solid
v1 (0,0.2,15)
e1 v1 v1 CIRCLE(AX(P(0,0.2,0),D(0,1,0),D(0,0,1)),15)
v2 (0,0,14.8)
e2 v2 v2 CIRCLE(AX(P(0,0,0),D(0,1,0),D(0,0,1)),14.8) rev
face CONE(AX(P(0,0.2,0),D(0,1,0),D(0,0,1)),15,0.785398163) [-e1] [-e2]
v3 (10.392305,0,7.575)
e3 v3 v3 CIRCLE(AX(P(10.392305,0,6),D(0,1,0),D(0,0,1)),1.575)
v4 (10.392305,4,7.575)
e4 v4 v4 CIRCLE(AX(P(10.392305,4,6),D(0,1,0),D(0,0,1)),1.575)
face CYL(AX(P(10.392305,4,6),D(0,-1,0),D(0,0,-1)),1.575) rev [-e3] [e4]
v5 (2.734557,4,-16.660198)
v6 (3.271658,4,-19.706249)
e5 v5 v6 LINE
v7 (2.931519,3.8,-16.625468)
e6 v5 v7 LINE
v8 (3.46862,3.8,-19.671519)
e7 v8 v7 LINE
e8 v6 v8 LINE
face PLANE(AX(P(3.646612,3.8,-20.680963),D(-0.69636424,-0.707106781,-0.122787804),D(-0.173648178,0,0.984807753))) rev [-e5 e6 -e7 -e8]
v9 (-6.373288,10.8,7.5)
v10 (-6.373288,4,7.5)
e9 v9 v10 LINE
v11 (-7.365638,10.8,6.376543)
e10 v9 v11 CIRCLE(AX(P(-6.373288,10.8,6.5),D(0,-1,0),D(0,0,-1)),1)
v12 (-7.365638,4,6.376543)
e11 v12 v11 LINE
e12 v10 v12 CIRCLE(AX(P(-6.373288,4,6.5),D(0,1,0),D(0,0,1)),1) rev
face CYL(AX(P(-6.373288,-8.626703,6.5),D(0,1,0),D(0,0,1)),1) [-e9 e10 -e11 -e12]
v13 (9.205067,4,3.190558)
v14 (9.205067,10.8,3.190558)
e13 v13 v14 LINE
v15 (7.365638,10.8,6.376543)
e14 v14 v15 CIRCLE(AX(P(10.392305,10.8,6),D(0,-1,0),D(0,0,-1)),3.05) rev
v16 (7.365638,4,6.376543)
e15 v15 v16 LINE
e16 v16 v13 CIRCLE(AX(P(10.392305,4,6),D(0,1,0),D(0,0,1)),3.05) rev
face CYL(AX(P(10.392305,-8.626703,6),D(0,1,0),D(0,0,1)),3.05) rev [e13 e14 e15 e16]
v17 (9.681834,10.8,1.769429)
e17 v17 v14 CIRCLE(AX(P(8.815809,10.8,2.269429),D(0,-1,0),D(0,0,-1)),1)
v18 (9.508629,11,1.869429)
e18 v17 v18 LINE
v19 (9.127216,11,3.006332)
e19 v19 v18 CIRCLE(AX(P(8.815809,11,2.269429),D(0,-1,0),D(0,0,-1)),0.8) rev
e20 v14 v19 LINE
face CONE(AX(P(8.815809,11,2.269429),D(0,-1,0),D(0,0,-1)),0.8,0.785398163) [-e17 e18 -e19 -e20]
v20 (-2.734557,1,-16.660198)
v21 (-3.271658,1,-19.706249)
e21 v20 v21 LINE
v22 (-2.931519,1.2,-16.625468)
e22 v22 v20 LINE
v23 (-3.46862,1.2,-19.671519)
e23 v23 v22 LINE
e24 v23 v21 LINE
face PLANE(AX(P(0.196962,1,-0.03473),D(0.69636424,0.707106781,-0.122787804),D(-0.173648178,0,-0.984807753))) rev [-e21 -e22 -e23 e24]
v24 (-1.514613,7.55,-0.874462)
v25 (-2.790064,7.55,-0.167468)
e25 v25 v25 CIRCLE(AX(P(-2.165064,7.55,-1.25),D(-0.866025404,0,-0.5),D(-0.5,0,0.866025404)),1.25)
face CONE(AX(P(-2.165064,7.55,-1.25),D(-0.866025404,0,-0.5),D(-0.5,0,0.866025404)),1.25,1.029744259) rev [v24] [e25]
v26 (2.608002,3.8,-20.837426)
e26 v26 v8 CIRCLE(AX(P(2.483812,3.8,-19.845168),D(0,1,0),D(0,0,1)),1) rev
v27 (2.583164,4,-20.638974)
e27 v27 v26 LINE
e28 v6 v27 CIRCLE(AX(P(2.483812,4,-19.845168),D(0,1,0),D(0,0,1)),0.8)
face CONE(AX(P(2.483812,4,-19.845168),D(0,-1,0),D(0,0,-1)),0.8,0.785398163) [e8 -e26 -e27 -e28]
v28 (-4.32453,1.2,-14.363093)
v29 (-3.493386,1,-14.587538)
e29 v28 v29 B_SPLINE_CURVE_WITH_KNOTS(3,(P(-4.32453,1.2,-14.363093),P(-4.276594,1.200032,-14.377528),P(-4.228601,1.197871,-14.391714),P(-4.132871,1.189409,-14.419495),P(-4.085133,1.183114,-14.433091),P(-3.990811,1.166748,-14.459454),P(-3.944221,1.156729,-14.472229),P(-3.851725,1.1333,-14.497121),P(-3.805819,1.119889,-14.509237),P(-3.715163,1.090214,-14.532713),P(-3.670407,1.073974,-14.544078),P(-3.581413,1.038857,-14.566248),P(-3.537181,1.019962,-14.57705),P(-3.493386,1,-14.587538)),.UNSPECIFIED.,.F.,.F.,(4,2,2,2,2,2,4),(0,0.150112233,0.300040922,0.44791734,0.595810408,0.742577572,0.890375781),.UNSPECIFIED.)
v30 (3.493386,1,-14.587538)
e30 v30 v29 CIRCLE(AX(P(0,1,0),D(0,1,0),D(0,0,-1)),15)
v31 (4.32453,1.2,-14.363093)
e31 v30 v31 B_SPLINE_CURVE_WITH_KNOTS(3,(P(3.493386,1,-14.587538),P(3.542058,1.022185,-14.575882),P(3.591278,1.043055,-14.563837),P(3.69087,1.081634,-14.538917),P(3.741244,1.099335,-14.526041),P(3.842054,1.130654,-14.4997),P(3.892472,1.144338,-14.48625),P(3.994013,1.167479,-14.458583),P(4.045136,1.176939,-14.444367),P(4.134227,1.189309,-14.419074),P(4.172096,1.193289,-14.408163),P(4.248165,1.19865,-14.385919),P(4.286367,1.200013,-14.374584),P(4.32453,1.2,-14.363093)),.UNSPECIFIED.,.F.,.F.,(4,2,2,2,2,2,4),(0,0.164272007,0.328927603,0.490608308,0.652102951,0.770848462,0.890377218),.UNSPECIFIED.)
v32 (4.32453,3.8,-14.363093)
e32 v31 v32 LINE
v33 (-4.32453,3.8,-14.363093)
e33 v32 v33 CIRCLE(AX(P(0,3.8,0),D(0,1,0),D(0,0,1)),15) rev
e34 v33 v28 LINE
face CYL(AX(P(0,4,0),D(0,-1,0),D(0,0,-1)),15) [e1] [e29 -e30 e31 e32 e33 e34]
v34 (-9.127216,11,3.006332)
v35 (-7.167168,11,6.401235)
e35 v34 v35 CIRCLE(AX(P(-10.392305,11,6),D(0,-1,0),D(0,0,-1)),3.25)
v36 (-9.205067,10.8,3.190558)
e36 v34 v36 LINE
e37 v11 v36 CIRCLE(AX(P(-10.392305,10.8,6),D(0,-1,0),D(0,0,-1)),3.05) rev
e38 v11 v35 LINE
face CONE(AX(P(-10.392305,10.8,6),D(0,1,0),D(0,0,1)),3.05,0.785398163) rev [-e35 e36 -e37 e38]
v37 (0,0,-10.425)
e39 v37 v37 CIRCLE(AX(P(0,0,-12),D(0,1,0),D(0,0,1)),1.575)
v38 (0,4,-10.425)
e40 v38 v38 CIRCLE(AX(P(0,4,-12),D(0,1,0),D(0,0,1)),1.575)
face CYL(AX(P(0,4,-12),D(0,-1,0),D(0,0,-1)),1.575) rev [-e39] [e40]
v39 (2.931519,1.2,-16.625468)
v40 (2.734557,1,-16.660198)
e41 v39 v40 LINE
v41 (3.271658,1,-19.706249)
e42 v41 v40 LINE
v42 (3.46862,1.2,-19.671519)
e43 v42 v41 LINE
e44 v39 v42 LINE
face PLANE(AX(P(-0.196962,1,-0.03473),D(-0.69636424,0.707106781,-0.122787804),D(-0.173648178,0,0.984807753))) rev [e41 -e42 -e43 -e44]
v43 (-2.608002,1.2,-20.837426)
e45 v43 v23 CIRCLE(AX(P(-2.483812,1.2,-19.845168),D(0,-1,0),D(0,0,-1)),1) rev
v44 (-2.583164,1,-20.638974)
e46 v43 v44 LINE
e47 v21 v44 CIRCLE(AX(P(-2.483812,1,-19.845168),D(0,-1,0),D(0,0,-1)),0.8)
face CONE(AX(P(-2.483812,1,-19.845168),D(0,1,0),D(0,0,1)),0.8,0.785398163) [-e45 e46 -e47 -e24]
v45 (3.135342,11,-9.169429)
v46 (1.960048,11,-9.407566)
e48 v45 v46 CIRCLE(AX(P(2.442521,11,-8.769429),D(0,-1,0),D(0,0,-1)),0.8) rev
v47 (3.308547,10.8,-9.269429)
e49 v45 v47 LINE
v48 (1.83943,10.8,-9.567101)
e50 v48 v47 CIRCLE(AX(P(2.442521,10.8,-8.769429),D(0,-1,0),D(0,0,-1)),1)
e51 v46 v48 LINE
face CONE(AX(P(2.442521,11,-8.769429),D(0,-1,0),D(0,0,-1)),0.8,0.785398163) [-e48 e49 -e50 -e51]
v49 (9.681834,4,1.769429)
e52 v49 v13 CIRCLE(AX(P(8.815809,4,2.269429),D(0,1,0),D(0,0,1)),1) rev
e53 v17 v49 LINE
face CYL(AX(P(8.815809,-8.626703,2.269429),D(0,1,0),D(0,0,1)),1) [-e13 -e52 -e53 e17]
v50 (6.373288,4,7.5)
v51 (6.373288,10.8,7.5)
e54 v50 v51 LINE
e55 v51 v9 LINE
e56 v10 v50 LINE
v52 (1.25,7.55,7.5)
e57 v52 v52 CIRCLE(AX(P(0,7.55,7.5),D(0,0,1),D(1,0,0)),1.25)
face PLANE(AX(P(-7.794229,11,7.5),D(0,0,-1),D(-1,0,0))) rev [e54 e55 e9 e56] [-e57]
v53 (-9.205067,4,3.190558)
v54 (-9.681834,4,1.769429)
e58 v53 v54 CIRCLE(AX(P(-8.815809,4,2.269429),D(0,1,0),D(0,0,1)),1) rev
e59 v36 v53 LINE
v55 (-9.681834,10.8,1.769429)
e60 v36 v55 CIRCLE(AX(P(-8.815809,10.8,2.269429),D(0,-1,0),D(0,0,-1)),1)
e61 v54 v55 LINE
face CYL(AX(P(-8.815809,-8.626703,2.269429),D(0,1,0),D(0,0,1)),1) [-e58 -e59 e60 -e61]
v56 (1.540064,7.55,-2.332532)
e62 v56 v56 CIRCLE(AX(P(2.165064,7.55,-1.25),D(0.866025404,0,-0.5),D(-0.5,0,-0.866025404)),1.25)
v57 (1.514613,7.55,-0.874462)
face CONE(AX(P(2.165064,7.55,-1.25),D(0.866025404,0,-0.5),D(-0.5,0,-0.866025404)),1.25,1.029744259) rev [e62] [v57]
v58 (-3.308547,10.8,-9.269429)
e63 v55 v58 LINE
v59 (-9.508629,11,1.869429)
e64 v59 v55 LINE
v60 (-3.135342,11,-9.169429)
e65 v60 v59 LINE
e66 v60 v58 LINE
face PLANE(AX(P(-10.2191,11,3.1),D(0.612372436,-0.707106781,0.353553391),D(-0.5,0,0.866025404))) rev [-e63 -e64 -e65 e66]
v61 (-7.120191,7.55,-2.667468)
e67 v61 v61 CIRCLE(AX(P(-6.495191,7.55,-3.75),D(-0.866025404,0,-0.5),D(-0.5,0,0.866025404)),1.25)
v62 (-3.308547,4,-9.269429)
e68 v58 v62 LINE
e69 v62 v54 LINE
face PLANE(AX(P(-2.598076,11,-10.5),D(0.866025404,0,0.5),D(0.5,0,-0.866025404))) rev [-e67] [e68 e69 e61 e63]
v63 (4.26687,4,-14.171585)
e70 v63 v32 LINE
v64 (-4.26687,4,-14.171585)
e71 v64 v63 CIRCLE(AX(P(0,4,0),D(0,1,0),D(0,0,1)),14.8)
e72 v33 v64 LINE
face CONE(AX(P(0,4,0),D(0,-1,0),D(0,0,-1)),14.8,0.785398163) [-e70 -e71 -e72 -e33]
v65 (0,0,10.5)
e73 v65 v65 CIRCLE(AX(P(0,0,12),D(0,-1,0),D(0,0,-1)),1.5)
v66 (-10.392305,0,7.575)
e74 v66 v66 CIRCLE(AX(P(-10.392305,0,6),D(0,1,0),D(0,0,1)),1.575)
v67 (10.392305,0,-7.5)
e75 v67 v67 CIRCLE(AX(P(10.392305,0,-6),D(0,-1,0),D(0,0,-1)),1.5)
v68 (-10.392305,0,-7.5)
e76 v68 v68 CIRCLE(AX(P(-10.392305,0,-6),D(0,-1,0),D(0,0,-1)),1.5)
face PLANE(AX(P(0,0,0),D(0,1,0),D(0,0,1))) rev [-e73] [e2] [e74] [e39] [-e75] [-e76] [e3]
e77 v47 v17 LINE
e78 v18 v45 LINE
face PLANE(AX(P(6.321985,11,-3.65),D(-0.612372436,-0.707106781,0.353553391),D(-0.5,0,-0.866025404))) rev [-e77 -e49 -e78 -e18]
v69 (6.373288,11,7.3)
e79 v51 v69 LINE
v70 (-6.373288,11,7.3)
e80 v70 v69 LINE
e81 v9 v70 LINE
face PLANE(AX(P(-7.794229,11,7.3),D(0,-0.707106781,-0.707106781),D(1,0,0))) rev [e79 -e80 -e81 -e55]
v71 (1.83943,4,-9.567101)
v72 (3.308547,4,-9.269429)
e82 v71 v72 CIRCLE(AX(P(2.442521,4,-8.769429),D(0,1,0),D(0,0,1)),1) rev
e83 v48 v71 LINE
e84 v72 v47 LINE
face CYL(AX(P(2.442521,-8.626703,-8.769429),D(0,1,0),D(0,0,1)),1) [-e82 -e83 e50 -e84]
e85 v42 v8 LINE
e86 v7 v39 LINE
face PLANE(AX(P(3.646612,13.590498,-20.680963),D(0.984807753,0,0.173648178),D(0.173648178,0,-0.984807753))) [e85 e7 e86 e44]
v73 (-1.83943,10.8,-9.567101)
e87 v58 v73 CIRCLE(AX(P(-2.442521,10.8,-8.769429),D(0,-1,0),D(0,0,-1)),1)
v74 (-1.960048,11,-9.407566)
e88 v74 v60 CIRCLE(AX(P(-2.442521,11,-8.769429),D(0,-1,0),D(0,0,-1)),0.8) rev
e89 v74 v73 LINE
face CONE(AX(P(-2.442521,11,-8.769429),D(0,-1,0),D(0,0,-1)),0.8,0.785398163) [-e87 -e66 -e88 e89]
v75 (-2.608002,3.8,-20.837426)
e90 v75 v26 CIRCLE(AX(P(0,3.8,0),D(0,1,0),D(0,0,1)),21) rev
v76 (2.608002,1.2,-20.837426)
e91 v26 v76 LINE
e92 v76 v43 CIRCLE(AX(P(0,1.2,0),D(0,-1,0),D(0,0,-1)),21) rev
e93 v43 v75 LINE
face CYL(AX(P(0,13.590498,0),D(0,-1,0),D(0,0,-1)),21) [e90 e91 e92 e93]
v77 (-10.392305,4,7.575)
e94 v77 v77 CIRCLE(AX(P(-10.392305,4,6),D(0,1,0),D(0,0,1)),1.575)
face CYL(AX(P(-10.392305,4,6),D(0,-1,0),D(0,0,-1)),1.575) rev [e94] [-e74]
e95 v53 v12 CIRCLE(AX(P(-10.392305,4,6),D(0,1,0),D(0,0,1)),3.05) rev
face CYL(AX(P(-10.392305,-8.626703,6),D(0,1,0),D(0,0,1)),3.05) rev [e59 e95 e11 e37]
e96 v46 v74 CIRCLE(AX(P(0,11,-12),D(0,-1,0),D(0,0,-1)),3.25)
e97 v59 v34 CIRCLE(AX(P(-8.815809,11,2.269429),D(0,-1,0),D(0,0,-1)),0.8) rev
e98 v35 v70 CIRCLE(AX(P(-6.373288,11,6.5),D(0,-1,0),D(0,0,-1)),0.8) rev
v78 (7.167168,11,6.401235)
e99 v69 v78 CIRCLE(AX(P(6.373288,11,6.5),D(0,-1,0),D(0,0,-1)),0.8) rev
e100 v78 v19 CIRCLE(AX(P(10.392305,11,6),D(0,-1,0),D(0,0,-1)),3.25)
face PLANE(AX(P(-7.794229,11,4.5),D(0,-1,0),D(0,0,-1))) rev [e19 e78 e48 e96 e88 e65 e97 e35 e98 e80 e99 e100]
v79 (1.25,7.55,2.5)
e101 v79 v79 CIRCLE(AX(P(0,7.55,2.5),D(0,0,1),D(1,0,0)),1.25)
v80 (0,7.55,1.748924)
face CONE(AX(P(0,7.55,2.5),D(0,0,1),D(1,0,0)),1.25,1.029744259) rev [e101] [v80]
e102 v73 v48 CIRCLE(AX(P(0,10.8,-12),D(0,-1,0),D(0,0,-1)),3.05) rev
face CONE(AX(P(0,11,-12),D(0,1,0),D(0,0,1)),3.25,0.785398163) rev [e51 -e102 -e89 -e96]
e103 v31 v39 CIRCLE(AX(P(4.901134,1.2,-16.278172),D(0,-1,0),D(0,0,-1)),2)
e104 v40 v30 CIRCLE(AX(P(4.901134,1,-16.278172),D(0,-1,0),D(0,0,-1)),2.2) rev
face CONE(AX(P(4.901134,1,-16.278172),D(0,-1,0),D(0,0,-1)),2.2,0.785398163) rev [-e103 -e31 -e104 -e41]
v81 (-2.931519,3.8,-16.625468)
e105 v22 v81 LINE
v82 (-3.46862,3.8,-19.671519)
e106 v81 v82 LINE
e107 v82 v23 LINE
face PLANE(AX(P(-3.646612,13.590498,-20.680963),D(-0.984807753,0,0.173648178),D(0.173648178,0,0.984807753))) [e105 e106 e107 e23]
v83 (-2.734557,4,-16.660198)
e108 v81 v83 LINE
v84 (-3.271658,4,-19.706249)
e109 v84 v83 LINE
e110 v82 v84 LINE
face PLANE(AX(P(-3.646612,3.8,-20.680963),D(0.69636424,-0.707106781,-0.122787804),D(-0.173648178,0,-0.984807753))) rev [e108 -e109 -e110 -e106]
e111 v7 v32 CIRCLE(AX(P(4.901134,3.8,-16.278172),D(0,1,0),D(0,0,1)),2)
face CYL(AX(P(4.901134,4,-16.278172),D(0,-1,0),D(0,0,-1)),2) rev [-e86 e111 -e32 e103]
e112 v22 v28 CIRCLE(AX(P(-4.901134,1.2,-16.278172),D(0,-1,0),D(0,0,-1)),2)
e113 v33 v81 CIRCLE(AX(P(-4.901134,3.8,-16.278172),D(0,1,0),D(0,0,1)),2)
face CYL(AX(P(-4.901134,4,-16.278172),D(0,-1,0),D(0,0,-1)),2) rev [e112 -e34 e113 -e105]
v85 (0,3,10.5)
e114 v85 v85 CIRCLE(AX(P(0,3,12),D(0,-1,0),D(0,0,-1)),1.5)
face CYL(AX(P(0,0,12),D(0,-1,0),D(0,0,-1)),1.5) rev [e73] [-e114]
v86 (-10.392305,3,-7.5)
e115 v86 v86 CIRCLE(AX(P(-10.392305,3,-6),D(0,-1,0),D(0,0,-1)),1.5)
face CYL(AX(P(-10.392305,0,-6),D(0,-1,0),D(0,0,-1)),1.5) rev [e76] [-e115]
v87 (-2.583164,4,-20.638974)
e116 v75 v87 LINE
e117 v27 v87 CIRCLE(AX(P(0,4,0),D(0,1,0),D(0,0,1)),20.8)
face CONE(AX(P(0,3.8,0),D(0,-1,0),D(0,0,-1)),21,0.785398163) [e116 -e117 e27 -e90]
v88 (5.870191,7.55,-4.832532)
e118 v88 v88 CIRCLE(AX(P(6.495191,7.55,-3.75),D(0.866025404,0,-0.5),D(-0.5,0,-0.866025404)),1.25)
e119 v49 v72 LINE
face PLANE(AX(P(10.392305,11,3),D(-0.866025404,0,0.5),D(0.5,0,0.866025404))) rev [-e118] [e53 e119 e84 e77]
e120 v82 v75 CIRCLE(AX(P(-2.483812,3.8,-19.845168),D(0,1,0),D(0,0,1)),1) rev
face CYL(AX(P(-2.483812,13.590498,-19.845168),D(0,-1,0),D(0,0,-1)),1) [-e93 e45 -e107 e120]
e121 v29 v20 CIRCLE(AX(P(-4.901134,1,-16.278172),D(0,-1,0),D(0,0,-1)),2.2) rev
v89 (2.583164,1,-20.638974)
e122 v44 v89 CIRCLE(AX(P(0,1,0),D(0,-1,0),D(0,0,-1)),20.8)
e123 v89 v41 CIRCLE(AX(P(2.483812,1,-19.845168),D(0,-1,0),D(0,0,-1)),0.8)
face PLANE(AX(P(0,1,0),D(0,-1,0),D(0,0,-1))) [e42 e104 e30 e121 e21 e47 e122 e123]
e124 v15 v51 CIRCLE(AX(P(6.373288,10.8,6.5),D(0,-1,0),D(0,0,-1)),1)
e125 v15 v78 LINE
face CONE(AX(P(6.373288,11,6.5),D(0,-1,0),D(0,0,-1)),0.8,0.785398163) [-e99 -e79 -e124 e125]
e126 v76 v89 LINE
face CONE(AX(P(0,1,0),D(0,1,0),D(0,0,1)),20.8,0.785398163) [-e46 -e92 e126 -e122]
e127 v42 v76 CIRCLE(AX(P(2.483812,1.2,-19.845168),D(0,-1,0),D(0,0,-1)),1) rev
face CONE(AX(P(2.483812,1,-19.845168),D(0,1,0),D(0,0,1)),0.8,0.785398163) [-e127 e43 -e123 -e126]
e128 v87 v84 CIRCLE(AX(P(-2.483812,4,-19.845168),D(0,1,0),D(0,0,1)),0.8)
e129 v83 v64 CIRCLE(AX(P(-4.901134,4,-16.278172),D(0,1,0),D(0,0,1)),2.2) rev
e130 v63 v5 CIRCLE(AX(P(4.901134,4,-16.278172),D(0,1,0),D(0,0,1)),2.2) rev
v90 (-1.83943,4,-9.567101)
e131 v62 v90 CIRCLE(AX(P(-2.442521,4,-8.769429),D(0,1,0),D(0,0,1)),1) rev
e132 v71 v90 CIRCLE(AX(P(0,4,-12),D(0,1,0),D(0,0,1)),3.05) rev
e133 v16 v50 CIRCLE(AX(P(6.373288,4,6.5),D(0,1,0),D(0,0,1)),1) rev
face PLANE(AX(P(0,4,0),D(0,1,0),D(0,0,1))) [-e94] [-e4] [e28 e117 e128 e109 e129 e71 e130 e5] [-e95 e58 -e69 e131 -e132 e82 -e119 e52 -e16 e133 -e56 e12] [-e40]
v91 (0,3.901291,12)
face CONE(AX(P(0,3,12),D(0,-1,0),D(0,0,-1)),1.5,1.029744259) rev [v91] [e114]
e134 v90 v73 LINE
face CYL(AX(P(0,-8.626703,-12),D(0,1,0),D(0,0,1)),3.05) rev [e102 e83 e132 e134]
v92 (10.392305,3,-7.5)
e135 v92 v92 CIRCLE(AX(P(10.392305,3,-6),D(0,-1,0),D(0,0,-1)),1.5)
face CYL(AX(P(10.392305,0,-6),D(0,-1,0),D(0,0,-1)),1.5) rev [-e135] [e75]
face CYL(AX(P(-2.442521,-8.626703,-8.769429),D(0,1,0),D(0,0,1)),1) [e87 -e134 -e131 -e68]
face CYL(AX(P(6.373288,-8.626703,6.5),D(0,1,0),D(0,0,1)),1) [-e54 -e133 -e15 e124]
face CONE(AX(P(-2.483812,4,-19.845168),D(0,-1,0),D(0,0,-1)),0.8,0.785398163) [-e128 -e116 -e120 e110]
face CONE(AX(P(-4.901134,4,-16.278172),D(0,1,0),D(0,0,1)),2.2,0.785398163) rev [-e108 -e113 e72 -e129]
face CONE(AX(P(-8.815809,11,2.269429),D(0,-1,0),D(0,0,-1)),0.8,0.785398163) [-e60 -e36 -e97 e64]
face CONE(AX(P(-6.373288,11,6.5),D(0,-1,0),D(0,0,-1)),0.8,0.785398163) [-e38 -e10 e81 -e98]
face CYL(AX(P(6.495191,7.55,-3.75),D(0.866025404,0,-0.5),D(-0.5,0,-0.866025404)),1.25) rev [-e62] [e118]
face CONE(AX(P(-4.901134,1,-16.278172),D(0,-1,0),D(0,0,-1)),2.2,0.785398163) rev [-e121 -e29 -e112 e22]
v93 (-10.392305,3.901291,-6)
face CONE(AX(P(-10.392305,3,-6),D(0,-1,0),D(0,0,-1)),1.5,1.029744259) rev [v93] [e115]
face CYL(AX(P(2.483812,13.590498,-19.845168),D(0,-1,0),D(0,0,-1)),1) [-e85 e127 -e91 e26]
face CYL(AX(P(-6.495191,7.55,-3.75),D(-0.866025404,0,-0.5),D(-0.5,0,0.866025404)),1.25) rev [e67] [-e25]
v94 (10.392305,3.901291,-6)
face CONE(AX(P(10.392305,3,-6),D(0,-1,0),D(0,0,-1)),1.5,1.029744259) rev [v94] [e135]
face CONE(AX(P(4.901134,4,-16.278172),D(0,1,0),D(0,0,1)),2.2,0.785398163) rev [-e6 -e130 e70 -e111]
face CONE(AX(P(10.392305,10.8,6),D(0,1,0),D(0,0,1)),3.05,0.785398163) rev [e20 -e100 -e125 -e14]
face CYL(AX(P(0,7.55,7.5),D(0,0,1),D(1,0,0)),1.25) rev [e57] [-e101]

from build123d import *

# Parameters (mm, degrees)
SKETCH_1_R               = 15
SKETCH_1_R_2             = 1.575
EXTRUDE_1_DEPTH          = 4
EXTRUDE_2_DEPTH          = 7
SKETCH_8_R               = 3.05
CUT_EXTRUDE_3_DEPTH      = 7
FILLET_4_R               = 1
SKETCH_10_R              = 1
CUT_EXTRUDE_4_DEPTH      = 5
PATTERN_CIRCULAR_2_COUNT = 3
EXTRUDE_3_DEPTH          = 3
FILLET_5_R               = 1
FILLET_7_R               = 2
CHAMFER_1_SIZE           = 0.2
F_3_0MM_1_D              = 3
F_3_0MM_1_DEPTH          = 3
F_3_0MM_1_TIP            = 0.901290929


with BuildPart() as part:
    # 草图1 → 凸台-拉伸1 (new body)
    with BuildSketch(Plane(origin=(0, 0, 0), x_dir=(1, 0, 0), z_dir=(0, 1, 0))):
        with Locations(Location((0, 0, 0), (0, 0, 270))):
            Circle(SKETCH_1_R)
        with Locations(Location((0, 12, 0), (0, 0, 270))):
            Circle(SKETCH_1_R_2, mode=Mode.SUBTRACT)
        with Locations(Location((10.392304845, -6, 0), (0, 0, 270))):
            Circle(SKETCH_1_R_2, mode=Mode.SUBTRACT)
        with Locations(Location((-10.392304845, -6, 0), (0, 0, 270))):
            Circle(SKETCH_1_R_2, mode=Mode.SUBTRACT)
    extrude(amount=EXTRUDE_1_DEPTH)

    # 草图3 → 凸台-拉伸2 (add)
    with BuildSketch(Plane(origin=(0, 4, 0), x_dir=(1, 0, 0), z_dir=(0, 1, 0))):
        with BuildLine():
            Line((-7.794228634, -7.5), (7.794228634, -7.5))
            ThreePointArc((7.794228634, -7.5), (10.392304845, -6), (10.392304845, -3))
            Line((10.392304845, -3), (2.598076211, 10.5))
            ThreePointArc((2.598076211, 10.5), (0, 12), (-2.598076211, 10.5))
            Line((-2.598076211, 10.5), (-10.392304845, -3))
            ThreePointArc((-10.392304845, -3), (-10.392304845, -6), (-7.794228634, -7.5))
        make_face()
    extrude(amount=EXTRUDE_2_DEPTH)

    # 草图8 → 切除-拉伸3 (cut)
    with BuildSketch(Plane(origin=(0, 11, 0), x_dir=(1, 0, 0), z_dir=(0, 1, 0))):
        with Locations((-10.392304845, -6)):
            Circle(SKETCH_8_R)
        with Locations((10.392304845, -6)):
            Circle(SKETCH_8_R)
        with Locations((0, 12)):
            Circle(SKETCH_8_R)
    extrude(amount=-CUT_EXTRUDE_3_DEPTH, mode=Mode.SUBTRACT)

    # 圆角4
    fillet_4_edges = [part.edges().sort_by_distance(p)[0] for p in [
        (-7.7366505, 7.5, 7.5),
        (-10.363515779, 7.5, 2.950135874),
        (7.7366505, 7.5, 7.5),
        (10.363515779, 7.5, 2.950135874),
        (2.626865278, 7.5, -10.450135874),
        (-2.626865278, 7.5, -10.450135874),
    ]]
    fillet(fillet_4_edges, radius=FILLET_4_R)

    # 草图10 → 切除-拉伸4 (cut)
    with BuildSketch(Plane(origin=(6.495190528, 0, -3.75), x_dir=(-0.4999999999999998, 0, -0.8660254037844388), z_dir=(0.8660254037844388, 0, -0.4999999999999998))):
        with Locations((0, 7.55)):
            Circle(SKETCH_10_R)
    cut_extrude_4 = extrude(amount=-CUT_EXTRUDE_4_DEPTH, mode=Mode.SUBTRACT)

    # 草图13 → M3 螺纹孔1 (revolve, cut)
    with BuildSketch(Plane(origin=(6.495190528, 7.55, -3.75), x_dir=(-0.4999999999999998, 0, -0.8660254037844388), z_dir=(0, 1, 0))):
        Polygon((0, 0), (0, 5.751075774), (1.25, 5), (1.25, 0), align=None)
    hole_wizard_m3_1 = revolve(axis=Axis((11.994451842, 7.55, -6.925), (-0.8660254037844388, 0, 0.4999999999999998)), mode=Mode.SUBTRACT)

    # 阵列(圆周)2: 切除-拉伸4, M3 螺纹孔1 ×3 about axis
    pattern_circular_2_axis = Axis((0, 4, 0), (0, -1, 0))
    add([cut_extrude_4.rotate(pattern_circular_2_axis, i * 360 / PATTERN_CIRCULAR_2_COUNT) for i in range(1, PATTERN_CIRCULAR_2_COUNT)], mode=Mode.SUBTRACT)
    add([hole_wizard_m3_1.rotate(pattern_circular_2_axis, i * 360 / PATTERN_CIRCULAR_2_COUNT) for i in range(1, PATTERN_CIRCULAR_2_COUNT)], mode=Mode.SUBTRACT)

    # 草图20 → 凸台-拉伸3 (add)
    with BuildSketch(Plane(origin=(0, 1, 0), x_dir=(-1, 0, 0), z_dir=(0, -1, 0))):
        with BuildLine():
            Line((-3.646611731, 20.680962813), (-2.604722665, 14.772116295))
            ThreePointArc((-2.604722665, 14.772116295), (0, 15), (2.604722665, 14.772116295))
            Line((2.604722665, 14.772116295), (3.646611731, 20.680962813))
            ThreePointArc((3.646611731, 20.680962813), (0, 21), (-3.646611731, 20.680962813))
        make_face()
    extrude(amount=-EXTRUDE_3_DEPTH)

    # 圆角5
    fillet_5_edges = [part.edges().sort_by_distance(p)[0] for p in [
        (-3.646611731, 2.5, -20.680962813),
        (3.646611731, 2.5, -20.680962813),
    ]]
    fillet(fillet_5_edges, radius=FILLET_5_R)

    # 圆角7
    fillet_7_edges = [part.edges().sort_by_distance(p)[0] for p in [
        (2.604722665, 2.5, -14.772116295),
        (-2.604722665, 2.5, -14.772116295),
    ]]
    fillet(fillet_7_edges, radius=FILLET_7_R)

    # 倒角1
    # the kernel refuses this chamfer: 0.2 mm, written as the material it takes off along each edge
    with BuildSketch(Plane(origin=(-2.442521348, 11, -8.769428926), x_dir=(0.6030916909390288, 0, -0.7976718700821178), z_dir=(0.7976718700821178, 0, 0.6030916909390288))) as chamfer_1_piece_1:
        Polygon((1 - CHAMFER_1_SIZE, 0), (1, -CHAMFER_1_SIZE), (1, 0), align=None)
    revolve(axis=Axis((-2.442521348, 11, -8.769428926), (0, 1, 0)), revolution_arc=97.091646084, mode=Mode.SUBTRACT)
    with BuildSketch(Plane(origin=(2.442521348, 11, -8.769428926), x_dir=(0.8660254037844386, 0, -0.4999999999999999), z_dir=(0.4999999999999999, 0, 0.8660254037844386))) as chamfer_1_piece_2:
        Polygon((1 - CHAMFER_1_SIZE, 0), (1, -CHAMFER_1_SIZE), (1, 0), align=None)
    revolve(axis=Axis((2.442521348, 11, -8.769428926), (0, 1, 0)), revolution_arc=97.091646084, mode=Mode.SUBTRACT)
    with BuildSketch(Plane(origin=(0, 1, 0), x_dir=(-0.12419059396175354, 0, -0.9922583818600007), z_dir=(-0.9922583818600007, 0, 0.12419059396175354))) as chamfer_1_piece_3:
        Polygon((21 - CHAMFER_1_SIZE, 0), (21, -CHAMFER_1_SIZE), (21, 0), align=None)
    revolve(axis=Axis((0, 1, 0), (0, -1, 0)), revolution_arc=14.268032035, mode=Mode.SUBTRACT)
    with BuildSketch(Plane(origin=(3.468619632, 1, -19.67151946), x_dir=(-0.9844354138551702, -0.027495876610586265, -0.1735825242275703), z_dir=(-0.17364817766693033, 0, 0.9848077530122081))) as chamfer_1_piece_4:
        Polygon((CHAMFER_1_SIZE * 0.999621916911, -CHAMFER_1_SIZE * 0.0274958766106), (-CHAMFER_1_SIZE * 0.0274958766106, -CHAMFER_1_SIZE * 0.999621916911), (0, 0), align=None)
    extrude(amount=3.093041339, mode=Mode.SUBTRACT)
    with BuildSketch(Plane(origin=(2.483811879, 1, -19.845167637), x_dir=(0.9848077530122081, 0, 0.17364817766693008), z_dir=(-0.17364817766693008, 0, 0.9848077530122081))) as chamfer_1_piece_5:
        Polygon((1 - CHAMFER_1_SIZE, 0), (1, CHAMFER_1_SIZE), (1, 0), align=None)
    revolve(axis=Axis((2.483811879, 1, -19.845167637), (0, 1, 0)), revolution_arc=92.865983983, mode=Mode.SUBTRACT)
    with BuildSketch(Plane(origin=(-2.483811879, 1, -19.845167637), x_dir=(-0.9848077530122081, 0, 0.17364817766693008), z_dir=(0.17364817766693008, 0, 0.9848077530122081))) as chamfer_1_piece_6:
        Polygon((1 - CHAMFER_1_SIZE, 0), (1, -CHAMFER_1_SIZE), (1, 0), align=None)
    revolve(axis=Axis((-2.483811879, 1, -19.845167637), (0, -1, 0)), revolution_arc=92.865983983, mode=Mode.SUBTRACT)
    with BuildSketch(Plane(origin=(0, 4, 0), x_dir=(-0.12419059396175354, 0, -0.9922583818600007), z_dir=(-0.9922583818600007, 0, 0.12419059396175354))) as chamfer_1_piece_7:
        Polygon((21 - CHAMFER_1_SIZE, 0), (21, CHAMFER_1_SIZE), (21, 0), align=None)
    revolve(axis=Axis((0, 4, 0), (0, -1, 0)), revolution_arc=14.268032035, mode=Mode.SUBTRACT)
    with BuildSketch(Plane(origin=(3.468619632, 4, -19.67151946), x_dir=(-0.9844354138551702, 0.027495876610587344, -0.1735825242275703), z_dir=(-0.17364817766693033, 0, 0.9848077530122081)), Plane(origin=(-2.93151864, 4, -16.625468368), x_dir=(0.9844354138551702, 0.027495876610587403, -0.17358252422757026), z_dir=(-0.17364817766693033, 0, -0.9848077530122081)), Plane(origin=(-2.93151864, 1, -16.625468368), x_dir=(-0.02707815246196976, 0.9996219169112968, 0.004774608866782614), z_dir=(-0.17364817766693033, 0, -0.9848077530122081))) as chamfer_1_piece_8:
        Polygon((CHAMFER_1_SIZE * 0.999621916911, CHAMFER_1_SIZE * 0.0274958766106), (-CHAMFER_1_SIZE * 0.0274958766106, CHAMFER_1_SIZE * 0.999621916911), (0, 0), align=None)
    extrude(amount=3.093041339, mode=Mode.SUBTRACT)
    with BuildSketch(Plane(origin=(2.483811879, 4, -19.845167637), x_dir=(0.9848077530122081, 0, 0.17364817766693008), z_dir=(-0.17364817766693008, 0, 0.9848077530122081))) as chamfer_1_piece_9:
        Polygon((1 - CHAMFER_1_SIZE, 0), (1, -CHAMFER_1_SIZE), (1, 0), align=None)
    revolve(axis=Axis((2.483811879, 4, -19.845167637), (0, 1, 0)), revolution_arc=92.865983983, mode=Mode.SUBTRACT)
    with BuildSketch(Plane(origin=(-2.483811879, 4, -19.845167637), x_dir=(-0.9848077530122081, 0, 0.17364817766693008), z_dir=(0.17364817766693008, 0, 0.9848077530122081))) as chamfer_1_piece_10:
        Polygon((1 - CHAMFER_1_SIZE, 0), (1, CHAMFER_1_SIZE), (1, 0), align=None)
    revolve(axis=Axis((-2.483811879, 4, -19.845167637), (0, -1, 0)), revolution_arc=92.865983983, mode=Mode.SUBTRACT)
    with BuildSketch(Plane(origin=(0, 4, 0), x_dir=(0, 0, 1), z_dir=(1, 0, 0))) as chamfer_1_piece_11:
        Polygon((15 - CHAMFER_1_SIZE, 0), (15, CHAMFER_1_SIZE), (15, 0), align=None)
    revolve(axis=Axis((0, 4, 0), (0, -1, 0)), revolution_arc=163.243672969, mode=Mode.SUBTRACT)
    with BuildSketch(Plane(origin=(-4.901134146, 1, -16.278172013), x_dir=(0.03518913738514584, 0, 0.9993806705205426), z_dir=(-0.9993806705205426, 0, 0.03518913738514584))) as chamfer_1_piece_12_section:
        Polygon((2 + CHAMFER_1_SIZE, 0), (2, CHAMFER_1_SIZE), (2, 0), align=None)
    chamfer_1_piece_12 = revolve(axis=Axis((-4.901134146, 1, -16.278172013), (0, 1, 0)), revolution_arc=97.983394612, mode=Mode.PRIVATE)
    chamfer_1_piece_12 = chamfer_1_piece_12 - Plane(origin=(0, 1.09755955, 0), x_dir=(0, 0, 1), z_dir=(0, -1, 0)) * Cylinder(15, 9, mode=Mode.PRIVATE)
    add(chamfer_1_piece_12, mode=Mode.SUBTRACT)
    with BuildSketch(Plane(origin=(-4.901134146, 4, -16.278172013), x_dir=(0.28830200860312294, 0, 0.9575395301685488), z_dir=(-0.9575395301685488, 0, 0.28830200860312294))) as chamfer_1_piece_13:
        Polygon((2 + CHAMFER_1_SIZE, 0), (2, -CHAMFER_1_SIZE), (2, 0), align=None)
    revolve(axis=Axis((-4.901134146, 4, -16.278172013), (0, 1, 0)), revolution_arc=83.243672969, mode=Mode.SUBTRACT)
    with BuildSketch(Plane(origin=(4.901134146, 1, -16.278172013), x_dir=(-0.9848077530122081, 0, -0.17364817766693008), z_dir=(0.17364817766693008, 0, -0.9848077530122081))) as chamfer_1_piece_14_section:
        Polygon((2 + CHAMFER_1_SIZE, 0), (2, CHAMFER_1_SIZE), (2, 0), align=None)
    chamfer_1_piece_14 = revolve(axis=Axis((4.901134146, 1, -16.278172013), (0, 1, 0)), revolution_arc=97.983394612, mode=Mode.PRIVATE)
    chamfer_1_piece_14 = chamfer_1_piece_14 - Plane(origin=(0, 1.056839913, 0), x_dir=(0, 0, 1), z_dir=(0, -1, 0)) * Cylinder(15, 9, mode=Mode.PRIVATE)
    add(chamfer_1_piece_14, mode=Mode.SUBTRACT)
    with BuildSketch(Plane(origin=(4.901134146, 4, -16.278172013), x_dir=(-0.9848077530122081, 0, -0.17364817766693008), z_dir=(0.17364817766693008, 0, -0.9848077530122081))) as chamfer_1_piece_15:
        Polygon((2 + CHAMFER_1_SIZE, 0), (2, -CHAMFER_1_SIZE), (2, 0), align=None)
    revolve(axis=Axis((4.901134146, 4, -16.278172013), (0, 1, 0)), revolution_arc=83.243672969, mode=Mode.SUBTRACT)
    with BuildSketch(Plane(origin=(0, 0, 0), x_dir=(0, 0, 1), z_dir=(-1, 0, 0))) as chamfer_1_piece_16:
        Polygon((15 - CHAMFER_1_SIZE, 0), (15, CHAMFER_1_SIZE), (15, 0), align=None)
    revolve(axis=Axis((0, 0, 0), (0, 1, 0)), mode=Mode.SUBTRACT)
    with BuildSketch(Plane(origin=(9.681834305, 11, 1.769428926), x_dir=(-0.8656979742248805, 0.027495876610587163, 0.49981095845564805), z_dir=(-0.49999999999999967, 0, -0.8660254037844388)), Plane(origin=(-3.308546752, 11, -9.269428926), x_dir=(0.8656979742248803, 0.027495876610587444, 0.4998109584556484), z_dir=(-0.5000000000000001, 0, 0.8660254037844387)), Plane(origin=(-6.373287553, 11, 7.5), x_dir=(0, 0.027495876610587302, -0.9996219169112966), z_dir=(1, 0, 0))) as chamfer_1_piece_17:
        Polygon((CHAMFER_1_SIZE * 0.999621916911, -CHAMFER_1_SIZE * 0.0274958766106), (-CHAMFER_1_SIZE * 0.0274958766106, -CHAMFER_1_SIZE * 0.999621916911), (0, 0), align=None)
    extrude(amount=12.746575105, mode=Mode.SUBTRACT)
    with BuildSketch(Plane(origin=(-10.392304845, 11, 6), x_dir=(0.3892582579058555, 0, -0.9211286602055646), z_dir=(-0.9211286602055646, 0, -0.3892582579058555))) as chamfer_1_piece_18:
        Polygon((3.05 + CHAMFER_1_SIZE, 0), (3.05, CHAMFER_1_SIZE), (3.05, 0), align=None)
    revolve(axis=Axis((-10.392304845, 11, 6), (0, -1, 0)), revolution_arc=74.183292169, mode=Mode.SUBTRACT)
    with BuildSketch(Plane(origin=(10.392304845, 11, 6), x_dir=(-0.38925825790586327, 0, -0.9211286602055614), z_dir=(0.9211286602055614, 0, -0.38925825790586327))) as chamfer_1_piece_19:
        Polygon((3.05 + CHAMFER_1_SIZE, 0), (3.05, -CHAMFER_1_SIZE), (3.05, 0), align=None)
    revolve(axis=Axis((10.392304845, 11, 6), (0, 1, 0)), revolution_arc=74.183292169, mode=Mode.SUBTRACT)
    with BuildSketch(Plane(origin=(0, 11, -12), x_dir=(-0.6030916909390313, 0, 0.7976718700821159), z_dir=(-0.7976718700821159, 0, -0.6030916909390313))) as chamfer_1_piece_20:
        Polygon((3.05 + CHAMFER_1_SIZE, 0), (3.05, -CHAMFER_1_SIZE), (3.05, 0), align=None)
    revolve(axis=Axis((0, 11, -12), (0, 1, 0)), revolution_arc=74.183292169, mode=Mode.SUBTRACT)
    with BuildSketch(Plane(origin=(6.373287553, 11, 6.5), x_dir=(0.9923499488448717, 0, -0.12345679012343067), z_dir=(-0.12345679012343067, 0, -0.9923499488448717))) as chamfer_1_piece_21:
        Polygon((1, CHAMFER_1_SIZE), (1 - CHAMFER_1_SIZE, 0), (1, 0), align=None)
    revolve(axis=Axis((6.373287553, 11, 6.5), (0, -1, 0)), revolution_arc=97.091646084, mode=Mode.SUBTRACT)
    with BuildSketch(Plane(origin=(8.815808901, 11, 2.269428926), x_dir=(0.389258257905862, 0, 0.9211286602055619), z_dir=(-0.9211286602055619, 0, 0.389258257905862))) as chamfer_1_piece_22:
        Polygon((1 - CHAMFER_1_SIZE, 0), (1, -CHAMFER_1_SIZE), (1, 0), align=None)
    revolve(axis=Axis((8.815808901, 11, 2.269428926), (0, 1, 0)), revolution_arc=97.091646084, mode=Mode.SUBTRACT)
    with BuildSketch(Plane(origin=(-6.373287553, 11, 6.5), x_dir=(-0.9923499488448708, 0, -0.12345679012343777), z_dir=(0.12345679012343777, 0, -0.9923499488448708))) as chamfer_1_piece_23:
        Polygon((1 - CHAMFER_1_SIZE, 0), (1, -CHAMFER_1_SIZE), (1, 0), align=None)
    revolve(axis=Axis((-6.373287553, 11, 6.5), (0, 1, 0)), revolution_arc=97.091646084, mode=Mode.SUBTRACT)
    with BuildSketch(Plane(origin=(-8.815808901, 11, 2.269428926), x_dir=(-0.8660254037844396, 0, -0.4999999999999984), z_dir=(0.4999999999999984, 0, -0.8660254037844396))) as chamfer_1_piece_24:
        Polygon((1 - CHAMFER_1_SIZE, 0), (1, -CHAMFER_1_SIZE), (1, 0), align=None)
    revolve(axis=Axis((-8.815808901, 11, 2.269428926), (0, 1, 0)), revolution_arc=97.091646084, mode=Mode.SUBTRACT)
    with BuildSketch(Plane(origin=(0, 4, 0), x_dir=(0.28830200860312166, 0, -0.9575395301685491), z_dir=(-0.9575395301685491, 0, -0.28830200860312166))) as chamfer_1_piece_25:
        Polygon((15 - CHAMFER_1_SIZE, 0), (15, CHAMFER_1_SIZE), (15, 0), align=None)
    revolve(axis=Axis((0, 4, 0), (0, -1, 0)), revolution_arc=163.243672969, mode=Mode.SUBTRACT)

    # Ø3.0mm 暗销孔1
    with Locations(Plane(origin=(0, 0, 0), x_dir=(-1, 0, 0), z_dir=(0, -1, 0))):
        with Locations((-10.392304845, 6), (0, -12), (10.392304845, 6)):
            Hole(F_3_0MM_1_D / 2, depth=F_3_0MM_1_DEPTH)
            with Locations((0, 0, -(F_3_0MM_1_DEPTH + F_3_0MM_1_TIP / 2))):  # 118° drill point
                Cone(0, F_3_0MM_1_D / 2, F_3_0MM_1_TIP, mode=Mode.SUBTRACT)


solid = part.part
